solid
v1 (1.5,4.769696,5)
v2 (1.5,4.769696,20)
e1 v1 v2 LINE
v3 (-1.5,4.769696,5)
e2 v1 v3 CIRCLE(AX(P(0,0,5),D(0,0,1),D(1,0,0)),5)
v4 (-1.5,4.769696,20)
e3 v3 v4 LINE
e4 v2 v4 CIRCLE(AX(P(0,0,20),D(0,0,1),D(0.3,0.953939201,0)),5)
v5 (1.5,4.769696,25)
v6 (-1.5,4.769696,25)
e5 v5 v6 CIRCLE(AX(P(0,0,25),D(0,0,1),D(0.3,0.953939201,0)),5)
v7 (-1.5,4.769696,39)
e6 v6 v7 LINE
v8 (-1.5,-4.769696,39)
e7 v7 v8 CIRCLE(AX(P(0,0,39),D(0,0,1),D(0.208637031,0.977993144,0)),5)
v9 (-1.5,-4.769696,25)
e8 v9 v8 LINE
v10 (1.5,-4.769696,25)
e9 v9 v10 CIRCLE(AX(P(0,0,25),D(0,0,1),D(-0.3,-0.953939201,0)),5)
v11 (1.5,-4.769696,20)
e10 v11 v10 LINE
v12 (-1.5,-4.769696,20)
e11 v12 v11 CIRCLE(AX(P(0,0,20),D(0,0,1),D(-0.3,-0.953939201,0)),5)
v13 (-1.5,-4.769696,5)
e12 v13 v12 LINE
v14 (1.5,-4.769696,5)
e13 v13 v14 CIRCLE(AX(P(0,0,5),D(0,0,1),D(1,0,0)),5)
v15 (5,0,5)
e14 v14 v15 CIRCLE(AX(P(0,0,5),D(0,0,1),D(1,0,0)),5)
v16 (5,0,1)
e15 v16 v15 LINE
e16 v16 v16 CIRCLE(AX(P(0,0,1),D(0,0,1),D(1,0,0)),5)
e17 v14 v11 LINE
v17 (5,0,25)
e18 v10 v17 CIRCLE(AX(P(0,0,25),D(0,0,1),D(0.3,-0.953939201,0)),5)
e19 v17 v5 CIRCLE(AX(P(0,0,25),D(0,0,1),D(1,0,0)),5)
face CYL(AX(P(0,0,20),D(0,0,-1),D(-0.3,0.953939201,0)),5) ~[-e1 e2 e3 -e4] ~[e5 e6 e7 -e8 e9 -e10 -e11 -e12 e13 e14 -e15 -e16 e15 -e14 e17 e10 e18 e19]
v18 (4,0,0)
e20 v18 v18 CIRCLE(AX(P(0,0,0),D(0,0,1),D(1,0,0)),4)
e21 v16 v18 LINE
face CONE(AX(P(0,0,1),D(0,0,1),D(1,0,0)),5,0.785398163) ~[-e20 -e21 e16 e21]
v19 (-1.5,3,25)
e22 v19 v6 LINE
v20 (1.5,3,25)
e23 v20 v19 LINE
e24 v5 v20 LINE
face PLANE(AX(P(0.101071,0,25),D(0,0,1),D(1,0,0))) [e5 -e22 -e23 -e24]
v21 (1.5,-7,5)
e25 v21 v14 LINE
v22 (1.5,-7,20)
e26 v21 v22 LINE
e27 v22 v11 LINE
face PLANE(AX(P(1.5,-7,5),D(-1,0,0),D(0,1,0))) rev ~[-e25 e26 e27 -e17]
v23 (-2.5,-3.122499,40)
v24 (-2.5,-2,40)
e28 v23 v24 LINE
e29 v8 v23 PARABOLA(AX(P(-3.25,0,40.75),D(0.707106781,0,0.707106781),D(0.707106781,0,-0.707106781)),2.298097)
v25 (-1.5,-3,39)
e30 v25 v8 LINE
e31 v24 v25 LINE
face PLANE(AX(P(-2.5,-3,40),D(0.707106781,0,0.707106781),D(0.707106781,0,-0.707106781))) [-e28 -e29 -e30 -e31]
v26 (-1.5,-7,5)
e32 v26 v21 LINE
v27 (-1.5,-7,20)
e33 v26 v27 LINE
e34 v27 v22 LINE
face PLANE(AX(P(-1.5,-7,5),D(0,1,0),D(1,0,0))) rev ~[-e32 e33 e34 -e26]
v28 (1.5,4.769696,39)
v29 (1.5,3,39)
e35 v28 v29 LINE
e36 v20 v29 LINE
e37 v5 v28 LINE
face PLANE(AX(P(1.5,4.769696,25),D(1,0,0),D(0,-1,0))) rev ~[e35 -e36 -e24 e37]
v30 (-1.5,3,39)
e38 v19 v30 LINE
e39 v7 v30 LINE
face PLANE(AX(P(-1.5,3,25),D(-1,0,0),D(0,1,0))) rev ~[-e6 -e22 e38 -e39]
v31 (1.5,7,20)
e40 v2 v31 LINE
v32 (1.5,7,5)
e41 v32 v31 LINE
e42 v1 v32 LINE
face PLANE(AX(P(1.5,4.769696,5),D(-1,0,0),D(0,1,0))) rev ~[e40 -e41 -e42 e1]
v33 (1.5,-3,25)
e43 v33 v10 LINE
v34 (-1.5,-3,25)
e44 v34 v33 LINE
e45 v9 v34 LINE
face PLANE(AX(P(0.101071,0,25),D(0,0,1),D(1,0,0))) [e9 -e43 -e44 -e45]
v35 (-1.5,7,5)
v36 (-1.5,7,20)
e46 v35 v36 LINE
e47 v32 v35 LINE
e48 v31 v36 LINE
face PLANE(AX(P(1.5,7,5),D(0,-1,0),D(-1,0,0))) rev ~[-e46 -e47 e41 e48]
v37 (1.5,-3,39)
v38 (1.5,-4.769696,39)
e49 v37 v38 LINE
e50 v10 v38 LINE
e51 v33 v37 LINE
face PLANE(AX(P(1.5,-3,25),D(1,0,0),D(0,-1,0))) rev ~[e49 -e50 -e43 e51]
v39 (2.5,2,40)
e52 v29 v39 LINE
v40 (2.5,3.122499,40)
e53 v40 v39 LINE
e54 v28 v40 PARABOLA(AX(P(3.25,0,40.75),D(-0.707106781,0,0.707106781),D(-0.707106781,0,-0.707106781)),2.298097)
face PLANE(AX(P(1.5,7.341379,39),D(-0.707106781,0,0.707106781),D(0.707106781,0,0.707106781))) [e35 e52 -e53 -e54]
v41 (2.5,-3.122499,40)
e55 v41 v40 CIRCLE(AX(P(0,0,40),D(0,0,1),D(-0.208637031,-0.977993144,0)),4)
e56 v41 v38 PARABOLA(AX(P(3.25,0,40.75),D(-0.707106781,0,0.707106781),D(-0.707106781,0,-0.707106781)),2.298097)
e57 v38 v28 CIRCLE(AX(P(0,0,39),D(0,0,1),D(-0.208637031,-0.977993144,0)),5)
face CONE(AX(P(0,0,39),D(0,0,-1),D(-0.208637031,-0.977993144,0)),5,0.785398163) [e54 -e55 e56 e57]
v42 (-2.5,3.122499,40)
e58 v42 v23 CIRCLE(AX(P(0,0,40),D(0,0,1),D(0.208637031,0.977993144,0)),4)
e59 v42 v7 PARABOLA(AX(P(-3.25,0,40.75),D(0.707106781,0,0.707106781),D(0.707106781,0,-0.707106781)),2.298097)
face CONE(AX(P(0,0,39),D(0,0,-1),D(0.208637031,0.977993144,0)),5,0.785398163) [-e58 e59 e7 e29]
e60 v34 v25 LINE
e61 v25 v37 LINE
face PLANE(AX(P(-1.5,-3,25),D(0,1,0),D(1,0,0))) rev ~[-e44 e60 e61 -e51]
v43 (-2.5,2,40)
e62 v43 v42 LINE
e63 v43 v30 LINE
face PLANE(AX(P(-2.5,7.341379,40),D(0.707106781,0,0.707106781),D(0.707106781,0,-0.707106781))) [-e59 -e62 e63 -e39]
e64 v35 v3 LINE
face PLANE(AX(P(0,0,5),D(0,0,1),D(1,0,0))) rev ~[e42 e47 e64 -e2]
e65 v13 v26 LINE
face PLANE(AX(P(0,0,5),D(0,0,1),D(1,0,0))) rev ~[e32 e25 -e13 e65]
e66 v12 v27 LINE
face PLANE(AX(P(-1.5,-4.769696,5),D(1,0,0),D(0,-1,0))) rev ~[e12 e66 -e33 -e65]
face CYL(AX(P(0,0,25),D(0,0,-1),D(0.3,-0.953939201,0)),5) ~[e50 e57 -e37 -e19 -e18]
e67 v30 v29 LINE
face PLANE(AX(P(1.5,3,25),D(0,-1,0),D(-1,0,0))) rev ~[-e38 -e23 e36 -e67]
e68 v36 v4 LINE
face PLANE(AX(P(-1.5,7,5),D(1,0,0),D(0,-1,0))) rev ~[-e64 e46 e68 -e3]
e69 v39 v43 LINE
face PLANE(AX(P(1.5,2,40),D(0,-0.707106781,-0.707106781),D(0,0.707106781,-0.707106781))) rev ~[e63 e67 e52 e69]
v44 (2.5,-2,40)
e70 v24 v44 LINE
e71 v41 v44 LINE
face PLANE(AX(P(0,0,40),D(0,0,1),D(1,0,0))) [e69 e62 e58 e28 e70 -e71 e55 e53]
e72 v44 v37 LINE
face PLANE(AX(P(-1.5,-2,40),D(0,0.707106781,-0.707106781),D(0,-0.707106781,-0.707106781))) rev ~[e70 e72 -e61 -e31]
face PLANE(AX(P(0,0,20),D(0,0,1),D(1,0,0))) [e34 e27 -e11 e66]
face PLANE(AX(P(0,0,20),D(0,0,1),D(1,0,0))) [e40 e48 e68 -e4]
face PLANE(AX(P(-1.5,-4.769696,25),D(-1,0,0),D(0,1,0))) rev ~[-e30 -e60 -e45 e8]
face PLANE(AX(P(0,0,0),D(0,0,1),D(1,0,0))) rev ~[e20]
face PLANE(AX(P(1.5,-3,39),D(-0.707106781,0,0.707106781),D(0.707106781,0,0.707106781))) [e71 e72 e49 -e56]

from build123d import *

# Parameters (mm, degrees)
F0_R         = 5
F1_DEPTH     = 5
F3_DEPTH     = 15
F5_DEPTH     = 5
F7_DEPTH     = 15
F8_T1_DEPTH  = 4.3413789951
F8_T3_DEPTH  = 3
F8_T5_DEPTH  = 4.3413789951
F8_T10_ANGLE = 204.0849815342
F8_T12_ANGLE = 204.0849815342
F8_T17_DEPTH = 6.913061983
F8_T21_DEPTH = 5.571682988
F8_T28_DEPTH = 6.913061983
F8_T32_DEPTH = 5.571682988
F8_T39_DEPTH = 6.913061983
F8_T43_DEPTH = 5.571682988
F8_T50_DEPTH = 5.571682988
F8_T54_DEPTH = 6.913061983


# Not quite as in the source:
# - a fillet or chamfer that OpenCascade refuses, or shapes differently, is made with other operations: its cross-section is extruded or revolved along the edge and cut away or added


with BuildPart() as f1:
    # F0 (on Top) → F1 (new body)
    with BuildSketch(Plane.XY):
        Circle(F0_R)
    extrude(amount=F1_DEPTH)

    # F2 (on face) → F3 (join)
    with BuildSketch(Plane.XY.offset(5)):
        with BuildLine():
            Line((-1.5, 7), (-1.5, 4.7696960071))
            ThreePointArc((-1.5, 4.7696960071), (-5, 0), (-1.5, -4.7696960071))
            Line((-1.5, -4.7696960071), (-1.5, -7))
            Line((-1.5, -7), (1.5, -7))
            Line((1.5, -7), (1.5, -4.7696960071))
            ThreePointArc((1.5, -4.7696960071), (5, 0), (1.5, 4.7696960071))
            Line((1.5, 4.7696960071), (1.5, 7))
            Line((1.5, 7), (-1.5, 7))
        make_face()
    extrude(amount=F3_DEPTH)

    # F4 (on face) → F5 (join)
    with BuildSketch(Plane.XY.offset(20)):
        with BuildLine():
            ThreePointArc((1.5, -4.7696960071), (4.0311288741, -2.9580398915), (5, 0))
            ThreePointArc((5, 0), (4.0311288741, 2.9580398915), (1.5, 4.7696960071))
            ThreePointArc((1.5, 4.7696960071), (0, 5), (-1.5, 4.7696960071))
            ThreePointArc((-1.5, 4.7696960071), (-5, 0), (-1.5, -4.7696960071))
            ThreePointArc((-1.5, -4.7696960071), (0, -5), (1.5, -4.7696960071))
        make_face()
    extrude(amount=F5_DEPTH)

    # F6 (on face) → F7 (join)
    with BuildSketch(Plane.XY.offset(25)):
        with BuildLine():
            Line((1.5, -3), (1.5, -4.7696960071))
            ThreePointArc((1.5, -4.7696960071), (5, 0), (1.5, 4.7696960071))
            Line((1.5, 4.7696960071), (1.5, 3))
            Line((1.5, 3), (-1.5, 3))
            Line((-1.5, 3), (-1.5, 4.7696960071))
            ThreePointArc((-1.5, 4.7696960071), (-5, 0), (-1.5, -4.7696960071))
            Line((-1.5, -4.7696960071), (-1.5, -3))
            Line((-1.5, -3), (1.5, -3))
        make_face()
    extrude(amount=F7_DEPTH)

    # F8: chamfer of 1 on 9 edges, made by hand

    # F8_s2 → F8_t1 (cut)
    with BuildSketch(Plane.XZ.offset(3)):
        Polygon((-2.5, 40), (-1.5, 39), (-1.5, 40), align=None)
        Polygon((1.5, 39), (2.5, 40), (1.5, 40), align=None)
    extrude(amount=F8_T1_DEPTH, mode=Mode.SUBTRACT)

    # F8_s4 → F8_t3 (cut)
    with BuildSketch(Plane.YZ.offset(-1.5)):
        Polygon((-2, 40), (-3, 39), (-3, 40), align=None)
        Polygon((2, 40), (3, 39), (3, 40), align=None)
    extrude(amount=F8_T3_DEPTH, mode=Mode.SUBTRACT)

    # F8_s6 → F8_t5 (cut)
    with BuildSketch(Plane.XZ.offset(-7.3413789951)):
        Polygon((1.5, 39), (2.5, 40), (1.5, 40), align=None)
        Polygon((-2.5, 40), (-1.5, 39), (-1.5, 40), align=None)
    extrude(amount=F8_T5_DEPTH, mode=Mode.SUBTRACT)

    # F8_s7 → F8_t8 (revolve, cut)
    with BuildSketch(Plane.XZ):
        Polygon((5, 1), (4, 0), (5, 0), align=None)
    revolve(axis=Axis((0, 0, 0), (0, 0, 1)), mode=Mode.SUBTRACT)

    # F8_s9 → F8_t10 (revolve, cut)
    with BuildSketch(Plane(origin=(0, 0, 0), x_dir=(0, 0, 1), z_dir=(-0.9779931437, 0.2086370315, 0))):
        Polygon((39, -5), (40, -4), (40, -5), align=None)
    revolve(axis=Axis((0, 0, 40), (0, 0, 1)), revolution_arc=F8_T10_ANGLE, mode=Mode.SUBTRACT)

    # F8_s11 → F8_t12 (revolve, cut)
    with BuildSketch(Plane(origin=(0, 0, 0), x_dir=(0, 0, 1), z_dir=(0.9779931437, -0.2086370315, 0))):
        Polygon((39, -5), (40, -4), (40, -5), align=None)
    revolve(axis=Axis((0, 0, 40), (0, 0, 1)), revolution_arc=F8_T12_ANGLE, mode=Mode.SUBTRACT)


with BuildPart() as f8_tool15:
    # F8_s16 → F8_t17 (new body)
    with BuildSketch(Plane.XZ.offset(7.3413789951)):
        Polygon((-2.5, 40), (-1.5, 39), (-1.5, 40), align=None)
    extrude(amount=-F8_T17_DEPTH)

    split(bisect_by=Plane.XZ.offset(3), keep=Keep.BOTTOM)


with BuildPart() as f8_tool19:
    # F8_s20 → F8_t21 (new body)
    with BuildSketch(Plane.YZ.offset(-4.071682988)):
        Polygon((-2, 40), (-3, 39), (-3, 40), align=None)
    extrude(amount=F8_T21_DEPTH)

    split(bisect_by=Plane.YZ.offset(-1.5), keep=Keep.BOTTOM)


with BuildPart() as f8_tool15_1:
    add(f8_tool15.part)

    # F8_t23: intersect F8_tool19
    add(f8_tool19.part, mode=Mode.INTERSECT)


with BuildPart() as f1_1:
    add(f1.part)

    # F8_t13: cut F8_tool15
    add(f8_tool15_1.part, mode=Mode.SUBTRACT)


with BuildPart() as f8_tool26:
    # F8_s27 → F8_t28 (new body)
    with BuildSketch(Plane.XZ.offset(0.428317012)):
        Polygon((1.5, 39), (2.5, 40), (1.5, 40), align=None)
    extrude(amount=F8_T28_DEPTH)

    split(bisect_by=Plane.XZ.offset(3), keep=Keep.BOTTOM)


with BuildPart() as f8_tool30:
    # F8_s31 → F8_t32 (new body)
    with BuildSketch(Plane.YZ.offset(-1.5)):
        Polygon((-2, 40), (-3, 39), (-3, 40), align=None)
    extrude(amount=F8_T32_DEPTH)

    split(bisect_by=Plane.YZ.offset(1.5), keep=Keep.TOP)


with BuildPart() as f8_tool26_1:
    add(f8_tool26.part)

    # F8_t34: intersect F8_tool30
    add(f8_tool30.part, mode=Mode.INTERSECT)


with BuildPart() as f1_2:
    add(f1_1.part)

    # F8_t24: cut F8_tool26
    add(f8_tool26_1.part, mode=Mode.SUBTRACT)


with BuildPart() as f8_tool37:
    # F8_s38 → F8_t39 (new body)
    with BuildSketch(Plane.XZ.offset(-7.3413789951)):
        Polygon((1.5, 39), (2.5, 40), (1.5, 40), align=None)
    extrude(amount=F8_T39_DEPTH)

    split(bisect_by=Plane.XZ.offset(-3), keep=Keep.TOP)


with BuildPart() as f8_tool41:
    # F8_s42 → F8_t43 (new body)
    with BuildSketch(Plane.YZ.offset(4.071682988)):
        Polygon((2, 40), (3, 39), (3, 40), align=None)
    extrude(amount=-F8_T43_DEPTH)

    split(bisect_by=Plane.YZ.offset(1.5), keep=Keep.TOP)


with BuildPart() as f8_tool37_1:
    add(f8_tool37.part)

    # F8_t45: intersect F8_tool41
    add(f8_tool41.part, mode=Mode.INTERSECT)


with BuildPart() as f1_3:
    add(f1_2.part)

    # F8_t35: cut F8_tool37
    add(f8_tool37_1.part, mode=Mode.SUBTRACT)


with BuildPart() as f8_tool48:
    # F8_s49 → F8_t50 (new body)
    with BuildSketch(Plane.YZ.offset(1.5)):
        Polygon((2, 40), (3, 39), (3, 40), align=None)
    extrude(amount=-F8_T50_DEPTH)

    split(bisect_by=Plane.YZ.offset(-1.5), keep=Keep.BOTTOM)


with BuildPart() as f8_tool52:
    # F8_s53 → F8_t54 (new body)
    with BuildSketch(Plane.XZ.offset(-0.428317012)):
        Polygon((-2.5, 40), (-1.5, 39), (-1.5, 40), align=None)
    extrude(amount=-F8_T54_DEPTH)

    split(bisect_by=Plane.XZ.offset(-3), keep=Keep.TOP)


with BuildPart() as f8_tool48_1:
    add(f8_tool48.part)

    # F8_t56: intersect F8_tool52
    add(f8_tool52.part, mode=Mode.INTERSECT)


with BuildPart() as f1_4:
    add(f1_3.part)

    # F8_t46: cut F8_tool48
    add(f8_tool48_1.part, mode=Mode.SUBTRACT)


solid = f1_4.part
